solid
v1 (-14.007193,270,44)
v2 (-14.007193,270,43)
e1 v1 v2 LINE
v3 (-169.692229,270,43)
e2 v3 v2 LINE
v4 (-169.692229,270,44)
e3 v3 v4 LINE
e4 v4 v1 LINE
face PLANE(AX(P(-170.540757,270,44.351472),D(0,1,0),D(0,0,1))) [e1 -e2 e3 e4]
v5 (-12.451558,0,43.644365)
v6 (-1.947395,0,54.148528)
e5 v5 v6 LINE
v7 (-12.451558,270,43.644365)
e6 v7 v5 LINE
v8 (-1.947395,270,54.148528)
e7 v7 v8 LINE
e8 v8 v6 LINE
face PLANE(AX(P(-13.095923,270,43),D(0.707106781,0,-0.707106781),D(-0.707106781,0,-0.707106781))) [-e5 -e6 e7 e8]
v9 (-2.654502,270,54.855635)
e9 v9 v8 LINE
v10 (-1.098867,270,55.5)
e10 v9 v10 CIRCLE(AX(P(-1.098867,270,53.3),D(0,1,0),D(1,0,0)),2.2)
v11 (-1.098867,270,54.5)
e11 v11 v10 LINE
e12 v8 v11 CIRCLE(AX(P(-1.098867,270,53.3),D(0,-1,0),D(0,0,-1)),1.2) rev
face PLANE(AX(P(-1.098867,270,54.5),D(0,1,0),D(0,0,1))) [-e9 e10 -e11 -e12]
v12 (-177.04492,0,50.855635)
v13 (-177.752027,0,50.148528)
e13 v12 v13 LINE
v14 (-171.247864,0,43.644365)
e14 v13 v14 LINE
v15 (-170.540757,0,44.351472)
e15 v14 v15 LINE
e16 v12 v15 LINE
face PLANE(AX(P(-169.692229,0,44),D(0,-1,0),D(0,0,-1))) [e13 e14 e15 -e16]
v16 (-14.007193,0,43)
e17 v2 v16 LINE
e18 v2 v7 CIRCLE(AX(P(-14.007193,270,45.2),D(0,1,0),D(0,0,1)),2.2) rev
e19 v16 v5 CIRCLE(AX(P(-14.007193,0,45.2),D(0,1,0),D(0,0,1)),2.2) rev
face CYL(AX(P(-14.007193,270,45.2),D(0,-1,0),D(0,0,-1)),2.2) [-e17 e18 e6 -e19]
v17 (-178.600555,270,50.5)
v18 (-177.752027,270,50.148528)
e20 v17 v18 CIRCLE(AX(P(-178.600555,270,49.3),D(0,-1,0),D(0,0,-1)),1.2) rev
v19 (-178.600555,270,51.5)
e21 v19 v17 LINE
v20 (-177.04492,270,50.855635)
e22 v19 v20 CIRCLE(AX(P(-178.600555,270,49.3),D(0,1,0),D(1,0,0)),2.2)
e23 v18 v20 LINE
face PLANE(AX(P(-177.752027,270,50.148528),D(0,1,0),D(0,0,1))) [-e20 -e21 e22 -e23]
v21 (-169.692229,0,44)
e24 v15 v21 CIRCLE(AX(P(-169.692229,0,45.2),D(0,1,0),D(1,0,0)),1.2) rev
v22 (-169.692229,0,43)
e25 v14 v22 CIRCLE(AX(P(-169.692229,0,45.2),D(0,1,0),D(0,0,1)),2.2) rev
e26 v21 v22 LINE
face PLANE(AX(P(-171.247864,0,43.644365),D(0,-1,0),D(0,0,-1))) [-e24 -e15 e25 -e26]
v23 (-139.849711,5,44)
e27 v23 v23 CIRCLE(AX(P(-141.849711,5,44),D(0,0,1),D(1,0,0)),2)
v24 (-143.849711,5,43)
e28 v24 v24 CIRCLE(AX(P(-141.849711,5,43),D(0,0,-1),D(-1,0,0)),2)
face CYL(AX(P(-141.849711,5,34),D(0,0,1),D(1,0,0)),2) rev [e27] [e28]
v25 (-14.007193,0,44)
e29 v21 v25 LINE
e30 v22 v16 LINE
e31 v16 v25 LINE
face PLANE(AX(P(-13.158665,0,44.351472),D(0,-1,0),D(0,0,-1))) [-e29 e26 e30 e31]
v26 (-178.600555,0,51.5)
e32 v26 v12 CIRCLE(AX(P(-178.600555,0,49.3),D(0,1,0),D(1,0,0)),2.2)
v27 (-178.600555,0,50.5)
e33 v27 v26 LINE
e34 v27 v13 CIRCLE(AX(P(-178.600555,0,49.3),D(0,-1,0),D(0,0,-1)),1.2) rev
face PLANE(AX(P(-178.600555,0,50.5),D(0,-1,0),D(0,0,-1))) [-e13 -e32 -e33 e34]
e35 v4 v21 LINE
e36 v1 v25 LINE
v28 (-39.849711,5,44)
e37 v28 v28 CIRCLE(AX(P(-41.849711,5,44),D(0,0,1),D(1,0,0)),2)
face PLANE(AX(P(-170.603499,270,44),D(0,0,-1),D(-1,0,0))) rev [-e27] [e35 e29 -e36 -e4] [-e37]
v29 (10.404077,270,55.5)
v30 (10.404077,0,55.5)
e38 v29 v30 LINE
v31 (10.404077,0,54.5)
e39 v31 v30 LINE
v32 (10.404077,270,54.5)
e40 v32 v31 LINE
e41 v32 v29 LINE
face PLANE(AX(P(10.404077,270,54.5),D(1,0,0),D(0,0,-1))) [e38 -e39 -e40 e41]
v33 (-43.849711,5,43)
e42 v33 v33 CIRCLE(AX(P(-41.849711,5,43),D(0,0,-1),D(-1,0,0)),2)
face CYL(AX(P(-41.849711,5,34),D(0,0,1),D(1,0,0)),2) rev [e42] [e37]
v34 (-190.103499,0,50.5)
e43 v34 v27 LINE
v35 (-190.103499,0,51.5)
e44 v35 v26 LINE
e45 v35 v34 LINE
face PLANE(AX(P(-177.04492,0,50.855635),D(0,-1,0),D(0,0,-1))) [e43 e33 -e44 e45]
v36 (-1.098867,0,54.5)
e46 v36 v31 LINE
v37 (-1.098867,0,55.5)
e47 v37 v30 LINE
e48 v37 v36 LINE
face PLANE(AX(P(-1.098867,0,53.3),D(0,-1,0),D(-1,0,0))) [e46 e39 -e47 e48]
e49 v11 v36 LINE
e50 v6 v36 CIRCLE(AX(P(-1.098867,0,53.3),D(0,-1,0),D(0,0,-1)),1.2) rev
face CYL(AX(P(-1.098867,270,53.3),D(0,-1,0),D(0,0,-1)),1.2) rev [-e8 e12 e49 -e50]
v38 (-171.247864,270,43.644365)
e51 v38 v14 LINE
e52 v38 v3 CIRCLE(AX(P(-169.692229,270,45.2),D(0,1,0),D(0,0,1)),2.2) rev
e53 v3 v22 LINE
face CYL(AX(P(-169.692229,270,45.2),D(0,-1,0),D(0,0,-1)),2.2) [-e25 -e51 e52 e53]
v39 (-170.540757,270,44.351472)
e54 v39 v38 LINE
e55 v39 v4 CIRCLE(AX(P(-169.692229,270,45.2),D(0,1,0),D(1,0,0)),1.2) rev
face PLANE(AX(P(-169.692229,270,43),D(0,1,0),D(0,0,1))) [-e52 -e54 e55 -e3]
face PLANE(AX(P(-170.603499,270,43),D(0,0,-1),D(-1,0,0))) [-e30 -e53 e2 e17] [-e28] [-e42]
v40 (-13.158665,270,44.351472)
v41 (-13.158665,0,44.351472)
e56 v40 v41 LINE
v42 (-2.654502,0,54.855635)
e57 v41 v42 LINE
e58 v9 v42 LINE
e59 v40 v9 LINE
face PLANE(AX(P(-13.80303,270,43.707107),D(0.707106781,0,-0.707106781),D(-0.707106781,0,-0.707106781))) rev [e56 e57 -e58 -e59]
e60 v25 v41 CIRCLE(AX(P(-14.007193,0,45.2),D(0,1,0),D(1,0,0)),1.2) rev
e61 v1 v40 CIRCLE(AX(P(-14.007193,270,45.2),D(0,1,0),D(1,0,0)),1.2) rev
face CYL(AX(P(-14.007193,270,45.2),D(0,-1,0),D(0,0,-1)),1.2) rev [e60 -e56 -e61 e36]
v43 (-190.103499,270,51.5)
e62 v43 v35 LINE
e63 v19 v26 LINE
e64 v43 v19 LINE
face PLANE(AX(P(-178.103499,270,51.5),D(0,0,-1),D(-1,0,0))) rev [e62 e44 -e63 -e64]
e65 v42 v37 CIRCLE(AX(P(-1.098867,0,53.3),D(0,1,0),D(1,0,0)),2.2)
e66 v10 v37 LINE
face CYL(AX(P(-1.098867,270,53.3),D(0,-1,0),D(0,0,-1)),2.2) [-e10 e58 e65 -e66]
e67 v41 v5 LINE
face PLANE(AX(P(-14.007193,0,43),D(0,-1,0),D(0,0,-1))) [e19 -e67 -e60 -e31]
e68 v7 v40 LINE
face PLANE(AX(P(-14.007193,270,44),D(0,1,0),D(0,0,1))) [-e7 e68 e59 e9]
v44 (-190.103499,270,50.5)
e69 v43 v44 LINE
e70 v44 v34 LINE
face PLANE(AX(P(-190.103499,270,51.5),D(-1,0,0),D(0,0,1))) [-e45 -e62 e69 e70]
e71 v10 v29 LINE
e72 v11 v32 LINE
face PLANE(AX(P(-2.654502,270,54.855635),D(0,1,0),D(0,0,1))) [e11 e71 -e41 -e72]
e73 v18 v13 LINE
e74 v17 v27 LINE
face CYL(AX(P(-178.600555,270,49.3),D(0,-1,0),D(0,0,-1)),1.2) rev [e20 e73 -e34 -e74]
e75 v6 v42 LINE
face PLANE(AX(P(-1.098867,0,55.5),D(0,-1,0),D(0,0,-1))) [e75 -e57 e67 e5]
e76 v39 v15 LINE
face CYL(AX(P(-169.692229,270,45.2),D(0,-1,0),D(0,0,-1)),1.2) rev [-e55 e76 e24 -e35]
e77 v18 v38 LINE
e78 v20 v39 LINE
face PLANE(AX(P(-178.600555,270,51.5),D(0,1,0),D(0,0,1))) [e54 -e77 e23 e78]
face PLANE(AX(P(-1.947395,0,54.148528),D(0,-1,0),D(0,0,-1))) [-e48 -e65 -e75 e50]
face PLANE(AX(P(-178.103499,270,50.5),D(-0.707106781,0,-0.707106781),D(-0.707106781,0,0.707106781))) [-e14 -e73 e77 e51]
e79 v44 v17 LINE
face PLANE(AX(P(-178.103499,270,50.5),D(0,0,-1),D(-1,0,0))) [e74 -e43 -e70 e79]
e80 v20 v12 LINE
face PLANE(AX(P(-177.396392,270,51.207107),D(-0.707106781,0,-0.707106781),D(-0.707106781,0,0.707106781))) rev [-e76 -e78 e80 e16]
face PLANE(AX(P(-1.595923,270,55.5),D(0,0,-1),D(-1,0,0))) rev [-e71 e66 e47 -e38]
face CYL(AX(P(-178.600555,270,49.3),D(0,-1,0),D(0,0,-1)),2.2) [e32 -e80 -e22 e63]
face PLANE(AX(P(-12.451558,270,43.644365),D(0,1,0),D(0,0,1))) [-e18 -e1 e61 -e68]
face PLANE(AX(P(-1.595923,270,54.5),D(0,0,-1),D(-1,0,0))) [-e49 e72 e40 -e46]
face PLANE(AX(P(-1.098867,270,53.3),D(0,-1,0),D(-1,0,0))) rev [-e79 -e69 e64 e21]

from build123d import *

# Parameters (mm, degrees)
SM_BASE_FLANGE_1_DEPTH = 270
SKETCH_2_R             = 2
CUT_EXTRUDE_1_DEPTH    = 10


# Sheet-metal steps are written as plain solids
with BuildPart() as part:
    # Sketch 1 → Базовая кромка1 (new body)
    with BuildSketch(Plane(origin=(0, 0, 0), x_dir=(1, 0, 0), z_dir=(0, 1, 0))):
        with BuildLine():
            Line((-190.103499123, -50.5), (-178.600555398, -50.5))
            ThreePointArc((-178.600555398, -50.5), (-178.141335279, -50.408655439), (-177.75202726, -50.148528137))
            Line((-177.75202726, -50.148528137), (-171.247864204, -43.644365081))
            ThreePointArc((-171.247864204, -43.644365081), (-170.534132837, -43.167465028), (-169.692229286, -43))
            Line((-169.692229286, -43), (-14.007193009, -43))
            ThreePointArc((-14.007193009, -43), (-13.165289458, -43.167465028), (-12.451558091, -43.644365081))
            Line((-12.451558091, -43.644365081), (-1.947395035, -54.148528137))
            ThreePointArc((-1.947395035, -54.148528137), (-1.558087016, -54.408655439), (-1.098866897, -54.5))
            Line((-1.098866897, -54.5), (10.404076828, -54.5))
            Line((10.404076828, -54.5), (10.404076828, -55.5))
            Line((10.404076828, -55.5), (-1.098866897, -55.5))
            ThreePointArc((-1.098866897, -55.5), (-1.940770449, -55.332534972), (-2.654501816, -54.855634919))
            Line((-2.654501816, -54.855634919), (-13.158664872, -44.351471863))
            ThreePointArc((-13.158664872, -44.351471863), (-13.547972891, -44.091344561), (-14.007193009, -44))
            Line((-14.007193009, -44), (-169.692229286, -44))
            ThreePointArc((-169.692229286, -44), (-170.151449405, -44.091344561), (-170.540757423, -44.351471863))
            Line((-170.540757423, -44.351471863), (-177.044920479, -50.855634919))
            ThreePointArc((-177.044920479, -50.855634919), (-177.758651847, -51.332534972), (-178.600555398, -51.5))
            Line((-178.600555398, -51.5), (-190.103499123, -51.5))
            Line((-190.103499123, -51.5), (-190.103499123, -50.5))
        make_face()
    extrude(amount=SM_BASE_FLANGE_1_DEPTH)

    # Эскиз2 → Вырез-Вытянуть1 (cut)
    with BuildSketch(Plane.XY.offset(44)):
        with Locations((-141.849711148, 5)):
            Circle(SKETCH_2_R)
        with Locations((-41.849711148, 5)):
            Circle(SKETCH_2_R)
    extrude(amount=-CUT_EXTRUDE_1_DEPTH, mode=Mode.SUBTRACT)


solid = part.part
